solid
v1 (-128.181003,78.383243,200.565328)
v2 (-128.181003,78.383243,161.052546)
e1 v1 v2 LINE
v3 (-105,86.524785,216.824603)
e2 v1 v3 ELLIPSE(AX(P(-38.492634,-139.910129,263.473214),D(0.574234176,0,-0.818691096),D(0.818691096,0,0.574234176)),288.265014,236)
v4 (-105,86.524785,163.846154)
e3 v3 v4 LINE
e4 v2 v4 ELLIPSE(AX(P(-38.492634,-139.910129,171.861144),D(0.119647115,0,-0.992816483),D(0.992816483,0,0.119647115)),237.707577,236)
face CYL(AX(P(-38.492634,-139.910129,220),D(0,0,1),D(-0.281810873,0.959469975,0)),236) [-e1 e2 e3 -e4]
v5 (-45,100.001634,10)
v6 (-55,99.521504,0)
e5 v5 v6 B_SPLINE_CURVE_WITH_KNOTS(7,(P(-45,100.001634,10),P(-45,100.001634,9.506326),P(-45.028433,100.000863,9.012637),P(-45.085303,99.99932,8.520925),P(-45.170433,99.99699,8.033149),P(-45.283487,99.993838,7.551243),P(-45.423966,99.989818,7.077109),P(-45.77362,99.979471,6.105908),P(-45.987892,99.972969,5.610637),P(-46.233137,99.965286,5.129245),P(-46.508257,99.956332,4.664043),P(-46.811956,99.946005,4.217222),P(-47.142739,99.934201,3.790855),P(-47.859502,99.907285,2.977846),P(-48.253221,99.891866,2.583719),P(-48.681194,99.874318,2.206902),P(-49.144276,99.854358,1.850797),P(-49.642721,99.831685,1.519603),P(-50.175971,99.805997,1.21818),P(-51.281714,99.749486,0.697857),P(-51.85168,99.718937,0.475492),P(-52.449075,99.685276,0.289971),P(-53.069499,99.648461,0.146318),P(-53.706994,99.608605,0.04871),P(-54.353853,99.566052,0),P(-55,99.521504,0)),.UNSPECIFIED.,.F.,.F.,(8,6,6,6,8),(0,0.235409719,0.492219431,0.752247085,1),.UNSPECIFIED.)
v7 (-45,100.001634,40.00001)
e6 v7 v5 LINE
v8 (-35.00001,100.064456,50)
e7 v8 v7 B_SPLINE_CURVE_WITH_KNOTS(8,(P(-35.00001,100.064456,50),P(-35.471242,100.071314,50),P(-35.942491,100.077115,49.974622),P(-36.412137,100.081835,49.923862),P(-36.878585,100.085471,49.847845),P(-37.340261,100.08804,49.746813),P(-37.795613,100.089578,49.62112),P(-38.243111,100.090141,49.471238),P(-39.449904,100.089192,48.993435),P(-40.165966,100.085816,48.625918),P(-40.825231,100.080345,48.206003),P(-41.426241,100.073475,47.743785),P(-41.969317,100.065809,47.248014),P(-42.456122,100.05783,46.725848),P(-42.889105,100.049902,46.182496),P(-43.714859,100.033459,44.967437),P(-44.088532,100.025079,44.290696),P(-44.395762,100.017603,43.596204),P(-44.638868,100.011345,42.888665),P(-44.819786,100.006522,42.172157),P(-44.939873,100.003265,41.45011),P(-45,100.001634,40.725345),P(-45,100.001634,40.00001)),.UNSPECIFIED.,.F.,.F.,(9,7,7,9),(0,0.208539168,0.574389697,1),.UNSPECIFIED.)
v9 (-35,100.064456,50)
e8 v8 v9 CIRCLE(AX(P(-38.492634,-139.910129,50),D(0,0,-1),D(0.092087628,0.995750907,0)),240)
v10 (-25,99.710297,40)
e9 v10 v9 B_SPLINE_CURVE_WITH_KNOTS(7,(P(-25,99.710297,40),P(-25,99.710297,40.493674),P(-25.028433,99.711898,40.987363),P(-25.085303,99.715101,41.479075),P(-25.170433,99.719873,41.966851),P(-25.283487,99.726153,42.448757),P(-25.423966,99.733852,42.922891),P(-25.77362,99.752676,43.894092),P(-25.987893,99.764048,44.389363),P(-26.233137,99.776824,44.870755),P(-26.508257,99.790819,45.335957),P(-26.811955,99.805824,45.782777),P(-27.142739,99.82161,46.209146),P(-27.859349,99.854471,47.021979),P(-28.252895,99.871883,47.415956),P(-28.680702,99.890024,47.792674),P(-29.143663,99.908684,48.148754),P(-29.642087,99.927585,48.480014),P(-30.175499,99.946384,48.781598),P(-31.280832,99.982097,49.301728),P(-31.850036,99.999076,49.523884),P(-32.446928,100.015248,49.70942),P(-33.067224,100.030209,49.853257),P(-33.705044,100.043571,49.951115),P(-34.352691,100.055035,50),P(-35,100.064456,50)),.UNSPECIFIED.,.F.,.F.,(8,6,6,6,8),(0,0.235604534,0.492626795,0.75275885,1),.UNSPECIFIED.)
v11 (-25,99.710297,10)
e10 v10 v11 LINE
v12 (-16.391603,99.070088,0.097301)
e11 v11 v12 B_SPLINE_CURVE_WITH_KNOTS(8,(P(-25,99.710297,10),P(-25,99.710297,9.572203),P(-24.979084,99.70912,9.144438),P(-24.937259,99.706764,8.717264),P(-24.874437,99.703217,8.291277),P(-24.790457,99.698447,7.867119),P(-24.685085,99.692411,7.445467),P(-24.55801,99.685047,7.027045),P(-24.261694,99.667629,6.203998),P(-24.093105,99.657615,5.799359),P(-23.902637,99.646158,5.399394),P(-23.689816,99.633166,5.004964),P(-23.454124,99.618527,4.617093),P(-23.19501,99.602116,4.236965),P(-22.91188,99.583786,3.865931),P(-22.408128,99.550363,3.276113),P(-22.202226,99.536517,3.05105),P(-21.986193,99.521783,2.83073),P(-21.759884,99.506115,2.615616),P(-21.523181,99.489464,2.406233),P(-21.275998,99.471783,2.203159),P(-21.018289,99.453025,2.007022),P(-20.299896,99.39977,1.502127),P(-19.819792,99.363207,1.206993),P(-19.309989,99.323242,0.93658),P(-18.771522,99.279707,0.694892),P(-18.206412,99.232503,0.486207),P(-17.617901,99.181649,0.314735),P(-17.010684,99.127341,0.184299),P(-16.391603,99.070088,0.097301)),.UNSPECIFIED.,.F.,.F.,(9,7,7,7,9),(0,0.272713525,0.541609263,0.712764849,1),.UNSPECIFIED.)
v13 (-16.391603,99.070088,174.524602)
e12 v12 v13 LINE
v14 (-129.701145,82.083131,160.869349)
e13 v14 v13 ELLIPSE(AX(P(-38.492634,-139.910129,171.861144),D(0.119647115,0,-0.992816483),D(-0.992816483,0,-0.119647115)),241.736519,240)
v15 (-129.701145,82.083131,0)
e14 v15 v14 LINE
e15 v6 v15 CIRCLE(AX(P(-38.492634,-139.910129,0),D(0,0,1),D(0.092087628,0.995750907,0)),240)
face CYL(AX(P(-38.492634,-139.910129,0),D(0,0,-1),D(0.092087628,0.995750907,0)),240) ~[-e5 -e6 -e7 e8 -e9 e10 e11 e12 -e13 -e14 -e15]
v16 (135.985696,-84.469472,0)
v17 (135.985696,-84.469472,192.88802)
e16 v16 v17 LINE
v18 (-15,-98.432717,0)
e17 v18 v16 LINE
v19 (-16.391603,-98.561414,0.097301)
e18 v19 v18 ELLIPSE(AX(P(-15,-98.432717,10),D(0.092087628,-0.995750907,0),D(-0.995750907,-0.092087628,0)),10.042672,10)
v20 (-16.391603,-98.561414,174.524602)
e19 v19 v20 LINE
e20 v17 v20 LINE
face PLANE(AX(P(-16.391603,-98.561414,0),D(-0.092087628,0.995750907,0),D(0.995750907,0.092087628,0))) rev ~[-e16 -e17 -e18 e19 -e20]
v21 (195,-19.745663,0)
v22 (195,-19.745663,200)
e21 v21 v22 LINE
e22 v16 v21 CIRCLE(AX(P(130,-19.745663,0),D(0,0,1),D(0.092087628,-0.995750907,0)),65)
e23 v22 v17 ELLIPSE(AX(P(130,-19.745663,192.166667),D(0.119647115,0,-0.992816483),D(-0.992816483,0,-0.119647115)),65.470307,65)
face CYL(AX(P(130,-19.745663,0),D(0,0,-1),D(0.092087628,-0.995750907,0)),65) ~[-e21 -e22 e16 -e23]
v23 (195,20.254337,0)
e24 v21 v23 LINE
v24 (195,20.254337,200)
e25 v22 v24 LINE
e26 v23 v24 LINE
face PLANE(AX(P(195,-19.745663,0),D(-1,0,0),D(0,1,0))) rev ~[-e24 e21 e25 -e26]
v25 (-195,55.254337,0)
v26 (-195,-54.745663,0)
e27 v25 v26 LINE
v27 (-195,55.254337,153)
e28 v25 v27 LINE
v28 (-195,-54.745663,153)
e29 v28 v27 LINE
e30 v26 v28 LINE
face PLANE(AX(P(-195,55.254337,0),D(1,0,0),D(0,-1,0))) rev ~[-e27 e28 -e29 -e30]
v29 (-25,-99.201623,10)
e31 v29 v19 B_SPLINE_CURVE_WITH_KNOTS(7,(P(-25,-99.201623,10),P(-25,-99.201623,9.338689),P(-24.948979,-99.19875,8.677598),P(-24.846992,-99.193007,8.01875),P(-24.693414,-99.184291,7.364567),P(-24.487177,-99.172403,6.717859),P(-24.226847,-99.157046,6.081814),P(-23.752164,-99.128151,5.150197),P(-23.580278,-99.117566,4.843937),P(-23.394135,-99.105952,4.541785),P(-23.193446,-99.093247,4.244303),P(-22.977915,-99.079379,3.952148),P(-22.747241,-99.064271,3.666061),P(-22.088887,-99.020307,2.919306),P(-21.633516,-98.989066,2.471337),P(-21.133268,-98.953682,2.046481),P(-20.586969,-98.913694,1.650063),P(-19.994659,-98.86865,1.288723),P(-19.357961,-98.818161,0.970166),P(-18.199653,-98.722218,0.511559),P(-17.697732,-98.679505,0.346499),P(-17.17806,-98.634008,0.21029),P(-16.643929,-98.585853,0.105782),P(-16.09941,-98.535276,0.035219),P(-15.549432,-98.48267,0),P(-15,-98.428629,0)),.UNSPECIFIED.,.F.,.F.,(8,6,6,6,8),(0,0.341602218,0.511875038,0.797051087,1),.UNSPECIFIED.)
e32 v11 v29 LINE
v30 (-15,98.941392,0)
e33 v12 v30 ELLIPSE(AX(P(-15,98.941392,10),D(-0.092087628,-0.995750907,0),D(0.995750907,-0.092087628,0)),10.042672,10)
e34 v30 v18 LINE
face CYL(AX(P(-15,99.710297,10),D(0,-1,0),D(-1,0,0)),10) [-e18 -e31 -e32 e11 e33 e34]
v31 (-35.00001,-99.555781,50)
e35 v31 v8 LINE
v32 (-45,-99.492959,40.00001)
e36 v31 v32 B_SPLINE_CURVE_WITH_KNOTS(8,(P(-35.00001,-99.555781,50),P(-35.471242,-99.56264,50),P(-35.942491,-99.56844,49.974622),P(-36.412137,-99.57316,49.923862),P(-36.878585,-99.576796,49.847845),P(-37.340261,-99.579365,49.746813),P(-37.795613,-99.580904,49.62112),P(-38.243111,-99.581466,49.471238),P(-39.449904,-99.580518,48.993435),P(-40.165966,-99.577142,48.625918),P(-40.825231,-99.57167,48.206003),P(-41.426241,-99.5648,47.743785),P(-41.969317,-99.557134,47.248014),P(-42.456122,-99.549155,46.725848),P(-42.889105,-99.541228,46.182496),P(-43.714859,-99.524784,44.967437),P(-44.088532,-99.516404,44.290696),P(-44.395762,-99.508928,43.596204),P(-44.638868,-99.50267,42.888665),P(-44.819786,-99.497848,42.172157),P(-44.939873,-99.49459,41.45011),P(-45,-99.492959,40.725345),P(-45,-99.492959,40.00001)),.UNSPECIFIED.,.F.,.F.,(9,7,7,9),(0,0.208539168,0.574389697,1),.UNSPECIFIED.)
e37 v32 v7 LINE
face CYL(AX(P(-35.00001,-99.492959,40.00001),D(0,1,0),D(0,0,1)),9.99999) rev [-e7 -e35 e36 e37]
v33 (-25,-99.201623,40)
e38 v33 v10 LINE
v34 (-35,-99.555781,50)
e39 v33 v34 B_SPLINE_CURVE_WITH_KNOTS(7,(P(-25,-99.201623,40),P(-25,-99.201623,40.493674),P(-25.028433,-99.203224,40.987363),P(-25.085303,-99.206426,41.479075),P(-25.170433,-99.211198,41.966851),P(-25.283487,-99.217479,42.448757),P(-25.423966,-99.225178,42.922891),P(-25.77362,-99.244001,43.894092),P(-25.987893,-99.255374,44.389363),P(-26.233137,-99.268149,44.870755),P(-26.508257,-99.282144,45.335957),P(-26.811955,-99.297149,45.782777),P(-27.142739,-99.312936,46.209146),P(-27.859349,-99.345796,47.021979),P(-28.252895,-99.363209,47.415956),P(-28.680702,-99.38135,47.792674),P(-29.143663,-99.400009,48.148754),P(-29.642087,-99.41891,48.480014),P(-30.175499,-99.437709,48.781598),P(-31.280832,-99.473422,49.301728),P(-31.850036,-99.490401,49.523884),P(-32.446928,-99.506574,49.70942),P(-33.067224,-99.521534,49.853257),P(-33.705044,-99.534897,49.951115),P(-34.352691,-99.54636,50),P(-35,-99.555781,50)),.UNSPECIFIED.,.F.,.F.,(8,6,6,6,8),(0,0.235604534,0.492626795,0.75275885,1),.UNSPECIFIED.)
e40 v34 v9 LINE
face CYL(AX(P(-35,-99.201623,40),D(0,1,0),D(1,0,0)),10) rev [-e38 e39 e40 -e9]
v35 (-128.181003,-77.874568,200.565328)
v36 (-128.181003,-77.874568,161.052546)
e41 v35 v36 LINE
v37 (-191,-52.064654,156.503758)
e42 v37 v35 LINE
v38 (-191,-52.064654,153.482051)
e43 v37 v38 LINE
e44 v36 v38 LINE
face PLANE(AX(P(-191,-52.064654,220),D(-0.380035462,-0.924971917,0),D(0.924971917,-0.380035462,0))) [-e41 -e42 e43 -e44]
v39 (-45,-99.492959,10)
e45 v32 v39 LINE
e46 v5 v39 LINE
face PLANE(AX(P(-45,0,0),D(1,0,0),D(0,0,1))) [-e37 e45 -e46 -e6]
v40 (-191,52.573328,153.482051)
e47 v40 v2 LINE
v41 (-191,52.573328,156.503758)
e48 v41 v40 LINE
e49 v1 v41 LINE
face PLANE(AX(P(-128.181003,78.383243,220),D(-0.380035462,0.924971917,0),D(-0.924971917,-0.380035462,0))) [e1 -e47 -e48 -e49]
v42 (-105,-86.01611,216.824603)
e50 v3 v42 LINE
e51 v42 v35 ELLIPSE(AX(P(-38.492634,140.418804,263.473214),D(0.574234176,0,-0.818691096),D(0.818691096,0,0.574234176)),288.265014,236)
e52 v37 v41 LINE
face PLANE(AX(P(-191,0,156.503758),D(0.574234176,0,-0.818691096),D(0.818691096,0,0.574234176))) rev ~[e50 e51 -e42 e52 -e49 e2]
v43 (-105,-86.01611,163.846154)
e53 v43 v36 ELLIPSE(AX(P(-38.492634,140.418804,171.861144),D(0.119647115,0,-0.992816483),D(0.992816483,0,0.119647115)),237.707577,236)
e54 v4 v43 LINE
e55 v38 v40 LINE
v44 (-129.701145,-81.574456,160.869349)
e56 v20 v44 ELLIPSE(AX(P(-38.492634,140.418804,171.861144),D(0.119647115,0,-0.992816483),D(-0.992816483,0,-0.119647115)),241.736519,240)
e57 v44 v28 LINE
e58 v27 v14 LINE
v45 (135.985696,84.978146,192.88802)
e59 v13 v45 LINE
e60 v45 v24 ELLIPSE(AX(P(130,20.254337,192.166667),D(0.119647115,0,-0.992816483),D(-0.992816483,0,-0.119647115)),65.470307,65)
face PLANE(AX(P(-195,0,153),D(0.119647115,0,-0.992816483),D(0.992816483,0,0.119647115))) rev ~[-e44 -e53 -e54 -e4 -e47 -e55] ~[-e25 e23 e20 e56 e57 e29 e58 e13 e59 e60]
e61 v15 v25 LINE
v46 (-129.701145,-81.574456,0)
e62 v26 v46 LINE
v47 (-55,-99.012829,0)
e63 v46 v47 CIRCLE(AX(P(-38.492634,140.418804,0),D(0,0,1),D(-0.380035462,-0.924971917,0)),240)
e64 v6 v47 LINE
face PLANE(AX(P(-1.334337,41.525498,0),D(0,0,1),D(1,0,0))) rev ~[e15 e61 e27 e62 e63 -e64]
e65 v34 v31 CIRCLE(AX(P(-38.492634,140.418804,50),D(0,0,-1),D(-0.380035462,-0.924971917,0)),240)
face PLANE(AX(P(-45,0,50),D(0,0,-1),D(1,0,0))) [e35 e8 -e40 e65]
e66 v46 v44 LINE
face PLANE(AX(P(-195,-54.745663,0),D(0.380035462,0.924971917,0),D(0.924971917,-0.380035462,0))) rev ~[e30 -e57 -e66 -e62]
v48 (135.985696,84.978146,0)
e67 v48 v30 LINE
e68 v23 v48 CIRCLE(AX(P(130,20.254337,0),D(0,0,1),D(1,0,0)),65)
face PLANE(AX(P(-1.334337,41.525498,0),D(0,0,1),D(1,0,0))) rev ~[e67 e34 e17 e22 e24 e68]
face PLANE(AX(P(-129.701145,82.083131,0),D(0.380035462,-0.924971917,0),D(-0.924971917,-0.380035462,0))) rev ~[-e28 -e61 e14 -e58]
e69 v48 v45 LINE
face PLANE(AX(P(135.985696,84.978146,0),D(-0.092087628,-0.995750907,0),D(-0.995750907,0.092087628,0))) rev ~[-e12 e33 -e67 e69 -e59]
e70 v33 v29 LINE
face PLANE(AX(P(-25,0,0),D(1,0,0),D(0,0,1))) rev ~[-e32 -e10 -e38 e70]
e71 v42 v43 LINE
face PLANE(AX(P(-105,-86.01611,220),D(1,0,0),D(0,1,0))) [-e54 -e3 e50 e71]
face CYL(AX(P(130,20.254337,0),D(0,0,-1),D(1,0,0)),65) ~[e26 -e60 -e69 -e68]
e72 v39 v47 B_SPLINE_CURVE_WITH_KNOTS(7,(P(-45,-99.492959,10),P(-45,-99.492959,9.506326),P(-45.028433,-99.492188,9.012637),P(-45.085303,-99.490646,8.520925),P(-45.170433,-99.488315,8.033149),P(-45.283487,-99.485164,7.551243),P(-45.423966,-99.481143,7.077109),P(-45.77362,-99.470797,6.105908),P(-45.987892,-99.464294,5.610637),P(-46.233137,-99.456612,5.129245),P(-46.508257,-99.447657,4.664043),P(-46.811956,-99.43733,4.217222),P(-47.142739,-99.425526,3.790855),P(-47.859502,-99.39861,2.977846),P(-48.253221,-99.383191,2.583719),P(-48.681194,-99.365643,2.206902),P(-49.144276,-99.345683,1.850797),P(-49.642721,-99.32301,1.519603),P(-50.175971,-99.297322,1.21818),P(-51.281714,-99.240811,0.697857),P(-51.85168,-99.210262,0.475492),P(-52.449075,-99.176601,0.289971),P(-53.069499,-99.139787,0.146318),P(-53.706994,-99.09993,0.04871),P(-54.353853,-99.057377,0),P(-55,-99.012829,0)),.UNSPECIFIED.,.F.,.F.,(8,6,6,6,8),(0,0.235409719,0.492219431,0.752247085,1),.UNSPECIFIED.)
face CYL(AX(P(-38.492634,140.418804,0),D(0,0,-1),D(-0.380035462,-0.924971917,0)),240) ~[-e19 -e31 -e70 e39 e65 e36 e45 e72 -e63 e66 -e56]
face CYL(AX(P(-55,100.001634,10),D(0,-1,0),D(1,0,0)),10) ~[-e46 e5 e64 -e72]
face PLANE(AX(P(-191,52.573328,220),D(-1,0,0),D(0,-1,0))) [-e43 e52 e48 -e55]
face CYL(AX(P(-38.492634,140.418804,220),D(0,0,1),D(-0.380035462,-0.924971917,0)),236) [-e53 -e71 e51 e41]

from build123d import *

# Parameters (mm, degrees)
F1_DEPTH  = 200
F4_DEPTH  = 110
F5_W      = 20
F5_H      = 50
F6_DEPTH  = 110
F7_R      = 10
F7_R_2    = 9.99999
F8_R      = 10
F12_DEPTH = 100


# Not quite as in the source:
# - a fillet or chamfer is up to 0.001 mm smaller than in the source, because OpenCascade refuses the exact size


with BuildPart() as f1:
    # F0 (on Top) → F1 (new body)
    with BuildSketch(Plane.XY):
        with BuildLine():
            Line((-129.7011448747, 82.0831308431), (-195, 55.2543373544))
            Line((-195, 55.2543373544), (-195, 0.2543373544))
            Line((-195, 0.2543373544), (195, 0.2543373544))
            Line((195, 0.2543373544), (195, 20.2543373544))
            ThreePointArc((195, 20.2543373544), (178.031605372, 64.0489133357), (135.9856958342, 84.9781463073))
            Line((135.9856958342, 84.9781463073), (-16.3916033039, 99.0700883522))
            ThreePointArc((-16.3916033039, 99.0700883522), (-74.0749348766, 97.4375057422), (-129.7011448747, 82.0831308431))
        make_face()
        with BuildLine():
            Line((195, 0.2543373544), (-195, 0.2543373544))
            Line((-195, 0.2543373544), (-195, -54.7456626456))
            Line((-195, -54.7456626456), (-129.7011448747, -81.5744561343))
            ThreePointArc((-129.7011448747, -81.5744561343), (-74.0749348766, -96.9288310334), (-16.3916033039, -98.5614136434))
            Line((-16.3916033039, -98.5614136434), (135.9856958342, -84.4694715986))
            ThreePointArc((135.9856958342, -84.4694715986), (178.031605372, -63.540238627), (195, -19.7456626456))
            Line((195, -19.7456626456), (195, 0.2543373544))
        make_face()
    extrude(amount=F1_DEPTH)

    # F3 (on Front) → F4 (cut, symmetric)
    with BuildSketch(Plane.XZ):
        Polygon((195, 200), (-195, 200), (-195, 153), align=None)
    extrude(amount=F4_DEPTH, both=True, mode=Mode.SUBTRACT)

    # F5 (on Front) → F6 (cut, symmetric)
    with BuildSketch(Plane.XZ):
        with Locations((-35, 25)):
            Rectangle(F5_W, F5_H)
    extrude(amount=F6_DEPTH, both=True, mode=Mode.SUBTRACT)

    # F7 (call 1 of 2: OpenCascade refuses the feature's edges together)
    f7_edges = [f1.edges().sort_by_distance(p)[0] for p in [
        (-25, 0.254337, 50),
    ]]
    fillet(f7_edges, radius=F7_R)

    # F7#2 (call 2 of 2) (radius 10 in the source; OpenCascade refuses exactly that, so slightly less here)
    f7_2_edges = [f1.edges().sort_by_distance(p)[0] for p in [
        (-45, 0.254337, 50),
    ]]
    fillet(f7_2_edges, radius=F7_R_2)

    # F8
    f8_edges = [f1.edges().sort_by_distance(p)[0] for p in [
        (-45, 0.254337, 0),
        (-25, 0.254337, 0),
    ]]
    fillet(f8_edges, radius=F8_R)

    # F9 (on offset) → F10 (join, up to the next surface of F1)
    with BuildSketch(Plane.XY.offset(220)):
        with BuildLine():
            Line((-105, -86.0161099703), (-105, 86.5247846791))
            ThreePointArc((-105, 86.5247846791), (-116.6965219134, 82.7558804952), (-128.181003028, 78.3832431737))
            Line((-128.181003028, 78.3832431737), (-191, 52.5733282266))
            Line((-191, 52.5733282266), (-191, -52.0646535178))
            Line((-191, -52.0646535178), (-128.181003028, -77.8745684649))
            ThreePointArc((-128.181003028, -77.8745684649), (-116.6965219134, -82.2472057865), (-105, -86.0161099703))
        make_face()
    extrude(until=Until.NEXT, dir=(0, 0, -1))

    # F11 (on Front) → F12 (cut, symmetric)
    with BuildSketch(Plane.XZ):
        Polygon((-191, 156.5037577633), (-105, 216.8246032937), (-105, 220), (-191, 220), align=None)
    extrude(amount=F12_DEPTH, both=True, mode=Mode.SUBTRACT)


solid = f1.part
